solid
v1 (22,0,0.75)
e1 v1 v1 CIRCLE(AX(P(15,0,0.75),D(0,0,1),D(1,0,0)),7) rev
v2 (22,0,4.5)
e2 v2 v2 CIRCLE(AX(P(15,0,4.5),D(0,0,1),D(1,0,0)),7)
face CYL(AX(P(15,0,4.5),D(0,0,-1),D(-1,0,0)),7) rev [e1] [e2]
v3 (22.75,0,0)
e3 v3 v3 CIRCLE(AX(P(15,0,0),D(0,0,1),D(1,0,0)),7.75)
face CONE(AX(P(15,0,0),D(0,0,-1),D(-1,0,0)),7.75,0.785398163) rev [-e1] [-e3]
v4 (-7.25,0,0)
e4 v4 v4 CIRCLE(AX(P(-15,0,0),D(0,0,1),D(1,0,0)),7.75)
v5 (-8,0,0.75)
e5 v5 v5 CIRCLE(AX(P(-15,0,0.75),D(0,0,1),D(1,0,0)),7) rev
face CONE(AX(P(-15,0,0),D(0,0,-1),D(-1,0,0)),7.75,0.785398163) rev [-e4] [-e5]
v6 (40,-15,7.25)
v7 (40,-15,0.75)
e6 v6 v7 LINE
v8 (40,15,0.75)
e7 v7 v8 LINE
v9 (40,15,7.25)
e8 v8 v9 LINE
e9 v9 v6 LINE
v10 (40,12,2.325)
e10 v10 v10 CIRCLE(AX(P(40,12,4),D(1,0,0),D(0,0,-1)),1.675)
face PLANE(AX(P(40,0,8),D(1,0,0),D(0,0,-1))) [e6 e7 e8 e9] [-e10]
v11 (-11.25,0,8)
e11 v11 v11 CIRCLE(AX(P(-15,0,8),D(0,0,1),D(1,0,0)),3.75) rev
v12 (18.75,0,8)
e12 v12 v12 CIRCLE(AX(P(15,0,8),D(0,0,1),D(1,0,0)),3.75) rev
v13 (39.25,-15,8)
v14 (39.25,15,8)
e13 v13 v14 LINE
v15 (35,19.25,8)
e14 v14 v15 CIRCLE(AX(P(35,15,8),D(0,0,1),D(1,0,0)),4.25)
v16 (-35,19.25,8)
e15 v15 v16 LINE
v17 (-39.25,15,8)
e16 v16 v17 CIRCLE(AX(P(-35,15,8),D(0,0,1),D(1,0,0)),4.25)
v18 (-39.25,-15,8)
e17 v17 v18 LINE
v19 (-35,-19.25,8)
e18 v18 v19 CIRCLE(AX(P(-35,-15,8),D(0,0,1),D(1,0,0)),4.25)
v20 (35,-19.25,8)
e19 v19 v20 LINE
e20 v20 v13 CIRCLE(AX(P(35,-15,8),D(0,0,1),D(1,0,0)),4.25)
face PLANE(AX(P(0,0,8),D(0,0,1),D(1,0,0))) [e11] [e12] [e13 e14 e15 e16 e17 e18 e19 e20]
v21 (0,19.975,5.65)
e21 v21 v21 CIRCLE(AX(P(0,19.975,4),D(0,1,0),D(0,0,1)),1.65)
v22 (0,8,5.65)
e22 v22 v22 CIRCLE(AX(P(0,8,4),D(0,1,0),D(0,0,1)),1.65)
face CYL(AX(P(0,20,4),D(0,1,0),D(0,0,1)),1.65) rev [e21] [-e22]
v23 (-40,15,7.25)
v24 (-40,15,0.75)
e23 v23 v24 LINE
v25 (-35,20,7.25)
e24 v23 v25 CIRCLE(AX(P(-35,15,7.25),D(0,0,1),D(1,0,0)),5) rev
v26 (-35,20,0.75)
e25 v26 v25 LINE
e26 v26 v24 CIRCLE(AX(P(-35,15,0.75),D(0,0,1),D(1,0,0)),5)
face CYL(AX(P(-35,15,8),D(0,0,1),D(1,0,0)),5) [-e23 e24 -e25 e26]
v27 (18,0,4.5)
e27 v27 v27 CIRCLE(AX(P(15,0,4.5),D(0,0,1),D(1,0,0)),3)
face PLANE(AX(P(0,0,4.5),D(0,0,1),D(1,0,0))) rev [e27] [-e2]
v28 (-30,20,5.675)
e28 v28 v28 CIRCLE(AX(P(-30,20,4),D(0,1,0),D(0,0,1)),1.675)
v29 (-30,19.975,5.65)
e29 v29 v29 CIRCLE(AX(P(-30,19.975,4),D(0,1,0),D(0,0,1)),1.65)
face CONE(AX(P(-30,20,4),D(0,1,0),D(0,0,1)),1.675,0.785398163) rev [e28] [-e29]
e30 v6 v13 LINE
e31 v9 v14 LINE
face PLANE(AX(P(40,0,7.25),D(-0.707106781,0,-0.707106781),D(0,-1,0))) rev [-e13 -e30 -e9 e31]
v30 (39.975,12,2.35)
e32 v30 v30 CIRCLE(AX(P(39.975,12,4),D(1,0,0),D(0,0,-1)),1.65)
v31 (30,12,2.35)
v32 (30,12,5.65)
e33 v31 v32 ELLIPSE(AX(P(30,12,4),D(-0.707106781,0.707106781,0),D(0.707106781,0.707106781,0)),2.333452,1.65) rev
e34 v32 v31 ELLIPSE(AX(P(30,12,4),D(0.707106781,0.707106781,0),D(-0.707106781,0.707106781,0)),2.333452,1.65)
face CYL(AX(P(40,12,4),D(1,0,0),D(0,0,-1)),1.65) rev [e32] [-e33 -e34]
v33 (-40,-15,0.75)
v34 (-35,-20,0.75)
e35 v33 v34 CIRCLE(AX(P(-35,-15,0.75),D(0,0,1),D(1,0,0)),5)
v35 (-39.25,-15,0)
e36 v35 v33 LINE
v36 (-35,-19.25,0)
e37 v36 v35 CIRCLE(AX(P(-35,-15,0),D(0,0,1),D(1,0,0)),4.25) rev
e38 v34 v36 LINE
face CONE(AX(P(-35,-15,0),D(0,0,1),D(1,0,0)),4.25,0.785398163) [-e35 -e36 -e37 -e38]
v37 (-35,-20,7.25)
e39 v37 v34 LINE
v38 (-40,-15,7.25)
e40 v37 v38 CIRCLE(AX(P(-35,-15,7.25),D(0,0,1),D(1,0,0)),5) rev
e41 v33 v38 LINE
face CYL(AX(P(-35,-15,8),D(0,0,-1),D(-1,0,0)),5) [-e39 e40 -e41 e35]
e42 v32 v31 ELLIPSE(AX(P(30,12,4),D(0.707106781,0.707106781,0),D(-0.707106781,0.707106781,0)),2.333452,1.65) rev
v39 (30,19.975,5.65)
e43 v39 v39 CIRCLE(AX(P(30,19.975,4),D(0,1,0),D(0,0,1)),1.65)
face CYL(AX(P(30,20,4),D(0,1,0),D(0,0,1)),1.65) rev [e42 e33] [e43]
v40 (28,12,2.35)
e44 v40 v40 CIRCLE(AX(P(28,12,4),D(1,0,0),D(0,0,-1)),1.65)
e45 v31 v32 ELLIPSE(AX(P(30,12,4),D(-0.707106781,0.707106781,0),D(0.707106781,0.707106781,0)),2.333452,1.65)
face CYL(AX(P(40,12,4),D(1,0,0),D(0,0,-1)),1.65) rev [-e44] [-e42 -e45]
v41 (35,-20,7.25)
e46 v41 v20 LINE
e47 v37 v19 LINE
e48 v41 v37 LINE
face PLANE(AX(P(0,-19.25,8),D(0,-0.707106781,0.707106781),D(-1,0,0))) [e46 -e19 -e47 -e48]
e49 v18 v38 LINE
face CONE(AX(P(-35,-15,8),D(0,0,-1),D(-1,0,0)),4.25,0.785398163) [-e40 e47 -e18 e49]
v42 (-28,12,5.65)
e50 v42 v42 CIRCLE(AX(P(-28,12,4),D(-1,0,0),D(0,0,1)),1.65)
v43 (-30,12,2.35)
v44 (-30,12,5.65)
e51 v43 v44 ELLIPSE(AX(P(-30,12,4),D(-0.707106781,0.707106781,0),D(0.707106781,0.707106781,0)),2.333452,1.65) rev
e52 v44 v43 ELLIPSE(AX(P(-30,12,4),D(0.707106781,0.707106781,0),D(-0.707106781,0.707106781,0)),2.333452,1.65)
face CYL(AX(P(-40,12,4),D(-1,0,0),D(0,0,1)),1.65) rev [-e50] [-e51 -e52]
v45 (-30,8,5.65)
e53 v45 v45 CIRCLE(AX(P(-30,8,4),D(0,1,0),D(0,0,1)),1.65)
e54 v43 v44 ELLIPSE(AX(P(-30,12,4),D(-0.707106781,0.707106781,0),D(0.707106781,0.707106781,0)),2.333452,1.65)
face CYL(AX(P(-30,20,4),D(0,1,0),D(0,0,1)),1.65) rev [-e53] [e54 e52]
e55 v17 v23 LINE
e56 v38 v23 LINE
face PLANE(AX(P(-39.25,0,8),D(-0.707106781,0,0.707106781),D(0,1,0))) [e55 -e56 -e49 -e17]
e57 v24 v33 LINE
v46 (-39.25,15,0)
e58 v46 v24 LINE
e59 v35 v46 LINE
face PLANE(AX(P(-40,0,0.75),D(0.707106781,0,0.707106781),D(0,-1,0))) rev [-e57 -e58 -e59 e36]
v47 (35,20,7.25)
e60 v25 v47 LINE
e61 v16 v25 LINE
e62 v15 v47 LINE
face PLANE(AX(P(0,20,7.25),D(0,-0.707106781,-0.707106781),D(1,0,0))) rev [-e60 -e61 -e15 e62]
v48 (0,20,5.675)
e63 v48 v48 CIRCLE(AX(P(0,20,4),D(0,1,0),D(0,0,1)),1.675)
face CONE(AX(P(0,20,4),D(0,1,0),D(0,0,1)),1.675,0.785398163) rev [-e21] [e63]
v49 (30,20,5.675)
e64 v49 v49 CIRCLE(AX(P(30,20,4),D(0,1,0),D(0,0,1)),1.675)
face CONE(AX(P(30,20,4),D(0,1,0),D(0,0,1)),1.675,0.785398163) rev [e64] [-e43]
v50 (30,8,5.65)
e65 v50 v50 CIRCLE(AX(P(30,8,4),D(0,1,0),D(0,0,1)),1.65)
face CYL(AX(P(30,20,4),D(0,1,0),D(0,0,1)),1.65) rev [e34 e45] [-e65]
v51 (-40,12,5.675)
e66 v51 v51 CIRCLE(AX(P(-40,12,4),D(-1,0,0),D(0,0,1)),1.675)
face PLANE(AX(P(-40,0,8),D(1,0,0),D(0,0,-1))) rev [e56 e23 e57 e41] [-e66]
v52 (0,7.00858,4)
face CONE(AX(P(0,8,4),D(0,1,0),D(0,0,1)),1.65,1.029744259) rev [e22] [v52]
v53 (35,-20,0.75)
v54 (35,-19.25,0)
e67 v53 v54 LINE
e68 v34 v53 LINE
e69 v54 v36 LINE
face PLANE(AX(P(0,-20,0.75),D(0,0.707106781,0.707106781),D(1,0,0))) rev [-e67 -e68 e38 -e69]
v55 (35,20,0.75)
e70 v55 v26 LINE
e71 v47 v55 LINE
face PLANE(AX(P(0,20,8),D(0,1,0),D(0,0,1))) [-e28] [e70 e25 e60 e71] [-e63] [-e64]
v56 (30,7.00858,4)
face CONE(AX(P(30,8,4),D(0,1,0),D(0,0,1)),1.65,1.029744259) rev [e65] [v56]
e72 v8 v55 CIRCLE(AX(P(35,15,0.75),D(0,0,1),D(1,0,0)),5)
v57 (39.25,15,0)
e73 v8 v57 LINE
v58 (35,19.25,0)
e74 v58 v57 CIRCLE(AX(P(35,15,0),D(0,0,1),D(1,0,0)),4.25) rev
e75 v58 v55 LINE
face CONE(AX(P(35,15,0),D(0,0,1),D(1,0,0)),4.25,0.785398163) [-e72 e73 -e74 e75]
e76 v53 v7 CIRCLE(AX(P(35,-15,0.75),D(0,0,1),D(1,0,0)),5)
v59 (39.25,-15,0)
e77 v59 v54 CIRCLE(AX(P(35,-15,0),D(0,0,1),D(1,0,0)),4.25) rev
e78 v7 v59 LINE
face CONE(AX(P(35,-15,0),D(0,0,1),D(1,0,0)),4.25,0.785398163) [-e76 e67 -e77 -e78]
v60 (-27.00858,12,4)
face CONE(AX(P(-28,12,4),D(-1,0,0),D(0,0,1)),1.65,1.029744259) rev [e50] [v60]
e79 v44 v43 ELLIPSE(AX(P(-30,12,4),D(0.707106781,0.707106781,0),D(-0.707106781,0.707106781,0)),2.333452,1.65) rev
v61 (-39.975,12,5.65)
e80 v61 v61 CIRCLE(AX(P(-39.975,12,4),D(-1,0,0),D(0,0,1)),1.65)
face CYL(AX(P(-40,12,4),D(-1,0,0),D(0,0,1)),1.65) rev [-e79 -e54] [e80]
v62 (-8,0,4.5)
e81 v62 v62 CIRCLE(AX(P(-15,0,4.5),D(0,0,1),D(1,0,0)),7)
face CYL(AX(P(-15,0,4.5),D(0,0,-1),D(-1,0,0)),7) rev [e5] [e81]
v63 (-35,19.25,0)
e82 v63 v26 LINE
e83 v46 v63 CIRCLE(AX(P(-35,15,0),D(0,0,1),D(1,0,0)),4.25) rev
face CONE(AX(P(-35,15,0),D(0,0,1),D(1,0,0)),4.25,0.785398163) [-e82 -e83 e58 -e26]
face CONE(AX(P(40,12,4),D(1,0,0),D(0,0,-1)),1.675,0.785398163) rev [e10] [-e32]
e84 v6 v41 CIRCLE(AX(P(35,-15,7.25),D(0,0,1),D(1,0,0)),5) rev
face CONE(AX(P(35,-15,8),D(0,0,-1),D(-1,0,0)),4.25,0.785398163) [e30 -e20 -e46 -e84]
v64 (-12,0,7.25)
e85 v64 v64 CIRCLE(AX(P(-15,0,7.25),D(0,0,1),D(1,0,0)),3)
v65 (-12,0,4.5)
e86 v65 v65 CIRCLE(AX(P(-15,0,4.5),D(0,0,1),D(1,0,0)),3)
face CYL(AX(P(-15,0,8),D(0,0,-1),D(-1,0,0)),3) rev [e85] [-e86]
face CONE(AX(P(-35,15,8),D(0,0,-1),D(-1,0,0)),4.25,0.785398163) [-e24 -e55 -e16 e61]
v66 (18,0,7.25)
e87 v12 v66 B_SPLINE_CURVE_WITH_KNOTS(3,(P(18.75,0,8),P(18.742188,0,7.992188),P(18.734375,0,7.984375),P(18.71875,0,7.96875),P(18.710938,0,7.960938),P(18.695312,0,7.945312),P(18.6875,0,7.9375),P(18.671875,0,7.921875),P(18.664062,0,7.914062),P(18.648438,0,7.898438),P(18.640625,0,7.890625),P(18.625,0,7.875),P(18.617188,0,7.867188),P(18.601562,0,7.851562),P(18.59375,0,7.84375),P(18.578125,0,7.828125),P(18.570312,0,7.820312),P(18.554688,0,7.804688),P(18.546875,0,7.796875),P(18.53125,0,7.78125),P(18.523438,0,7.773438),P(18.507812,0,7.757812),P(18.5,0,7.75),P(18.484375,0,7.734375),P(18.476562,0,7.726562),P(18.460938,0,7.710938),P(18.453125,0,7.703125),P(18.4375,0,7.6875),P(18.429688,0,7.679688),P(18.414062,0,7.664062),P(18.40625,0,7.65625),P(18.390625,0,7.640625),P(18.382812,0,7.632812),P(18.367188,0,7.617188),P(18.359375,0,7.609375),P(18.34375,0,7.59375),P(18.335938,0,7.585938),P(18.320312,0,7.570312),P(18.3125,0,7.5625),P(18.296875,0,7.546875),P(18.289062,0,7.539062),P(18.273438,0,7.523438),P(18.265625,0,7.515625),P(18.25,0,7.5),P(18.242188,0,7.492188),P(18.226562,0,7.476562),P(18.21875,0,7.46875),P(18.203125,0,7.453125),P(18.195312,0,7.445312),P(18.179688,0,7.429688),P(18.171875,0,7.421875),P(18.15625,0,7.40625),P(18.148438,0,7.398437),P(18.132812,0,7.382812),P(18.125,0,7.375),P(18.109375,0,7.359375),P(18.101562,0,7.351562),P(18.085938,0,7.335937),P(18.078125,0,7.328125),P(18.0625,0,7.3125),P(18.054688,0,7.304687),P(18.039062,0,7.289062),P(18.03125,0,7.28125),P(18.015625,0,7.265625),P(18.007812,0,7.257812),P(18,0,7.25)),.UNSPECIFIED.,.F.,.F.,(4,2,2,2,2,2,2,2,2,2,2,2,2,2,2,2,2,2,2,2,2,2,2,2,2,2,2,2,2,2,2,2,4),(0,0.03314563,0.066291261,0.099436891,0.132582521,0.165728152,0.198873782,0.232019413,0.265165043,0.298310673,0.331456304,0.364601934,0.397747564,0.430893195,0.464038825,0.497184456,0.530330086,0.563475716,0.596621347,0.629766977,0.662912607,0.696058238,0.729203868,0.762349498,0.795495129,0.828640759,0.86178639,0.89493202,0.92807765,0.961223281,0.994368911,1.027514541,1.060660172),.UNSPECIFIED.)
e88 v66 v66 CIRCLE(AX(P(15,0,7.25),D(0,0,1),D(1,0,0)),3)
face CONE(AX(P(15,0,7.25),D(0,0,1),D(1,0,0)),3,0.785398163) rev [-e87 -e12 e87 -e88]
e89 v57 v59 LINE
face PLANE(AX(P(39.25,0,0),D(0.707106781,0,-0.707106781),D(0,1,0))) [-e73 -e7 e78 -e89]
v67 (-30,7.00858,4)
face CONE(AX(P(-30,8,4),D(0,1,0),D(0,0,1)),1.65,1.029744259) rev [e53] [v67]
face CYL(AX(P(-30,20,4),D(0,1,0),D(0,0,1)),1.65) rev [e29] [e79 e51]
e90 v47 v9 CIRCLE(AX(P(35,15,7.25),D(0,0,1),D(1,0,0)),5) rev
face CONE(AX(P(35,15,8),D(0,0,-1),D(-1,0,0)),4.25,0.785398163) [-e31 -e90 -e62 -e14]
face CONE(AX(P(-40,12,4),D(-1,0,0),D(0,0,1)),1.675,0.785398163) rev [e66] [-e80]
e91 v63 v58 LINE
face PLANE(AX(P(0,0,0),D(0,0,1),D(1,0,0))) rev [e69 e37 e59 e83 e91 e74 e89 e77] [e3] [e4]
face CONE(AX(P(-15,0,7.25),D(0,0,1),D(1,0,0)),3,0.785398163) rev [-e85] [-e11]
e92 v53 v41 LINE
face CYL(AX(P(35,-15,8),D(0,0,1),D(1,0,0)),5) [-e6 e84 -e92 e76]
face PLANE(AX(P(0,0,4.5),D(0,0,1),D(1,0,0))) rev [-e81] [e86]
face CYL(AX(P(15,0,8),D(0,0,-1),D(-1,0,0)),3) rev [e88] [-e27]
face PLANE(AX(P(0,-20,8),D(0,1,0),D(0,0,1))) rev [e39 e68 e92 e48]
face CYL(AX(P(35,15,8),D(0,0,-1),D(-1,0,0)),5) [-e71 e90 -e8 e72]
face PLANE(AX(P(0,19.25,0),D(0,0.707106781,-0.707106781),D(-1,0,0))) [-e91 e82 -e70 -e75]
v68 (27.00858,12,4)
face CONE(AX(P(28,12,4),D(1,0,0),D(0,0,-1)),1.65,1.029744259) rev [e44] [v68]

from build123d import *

# Parameters (mm, degrees)
SKETCH1_W                             = 80
SKETCH1_H                             = 40
SKETCH1_R                             = 7
SKETCH1_R_2                           = 3
BOSS_EXTRUDE1_DEPTH                   = 8
CUT_EXTRUDE1_OUTLINE_R                = 7
CUT_EXTRUDE1_OUTLINE_R_2              = 3
CUT_EXTRUDE1_DEPTH                    = 4.5
FILLET1_R                             = 5
TAP_DRILL_FOR_M4X0_7_TAP1_D           = 3.3
TAP_DRILL_FOR_M4X0_7_TAP1_DEPTH       = 12
TAP_DRILL_FOR_M4X0_7_TAP1_CSINK_D     = 3.35
TAP_DRILL_FOR_M4X0_7_TAP1_CSINK_ANGLE = 90
TAP_DRILL_FOR_M4X0_7_TAP1_TIP         = 0.991420021
TAP_DRILL_FOR_M4X0_7_TAP2_D           = 3.3
TAP_DRILL_FOR_M4X0_7_TAP2_DEPTH       = 12
TAP_DRILL_FOR_M4X0_7_TAP2_CSINK_D     = 3.35
TAP_DRILL_FOR_M4X0_7_TAP2_CSINK_ANGLE = 90
TAP_DRILL_FOR_M4X0_7_TAP2_TIP         = 0.991420021
TAP_DRILL_FOR_M4X0_7_TAP3_D           = 3.3
TAP_DRILL_FOR_M4X0_7_TAP3_DEPTH       = 12
TAP_DRILL_FOR_M4X0_7_TAP3_CSINK_D     = 3.35
TAP_DRILL_FOR_M4X0_7_TAP3_CSINK_ANGLE = 90
TAP_DRILL_FOR_M4X0_7_TAP3_TIP         = 0.991420021
CHAMFER1_SIZE                         = 0.75


# Read off the part's stored shape, not the designer's step: Cut-Extrude1
with BuildPart() as part:
    # Sketch1 → Boss-Extrude1 (new body)
    # profile 1 of 3: a face of its own
    with BuildSketch(Plane.XY):
        Rectangle(SKETCH1_W, SKETCH1_H)
        with Locations((15, 0)):
            Circle(SKETCH1_R, mode=Mode.SUBTRACT)
        with Locations((-15, 0)):
            Circle(SKETCH1_R, mode=Mode.SUBTRACT)
    # profile 2 of 3: a face of its own
    with BuildSketch(Plane.XY):
        with Locations((-15, 0)):
            Circle(SKETCH1_R)
        with Locations((-15, 0)):
            Circle(SKETCH1_R_2, mode=Mode.SUBTRACT)
    # profile 3 of 3: a face of its own
    with BuildSketch(Plane.XY):
        with Locations((15, 0)):
            Circle(SKETCH1_R)
        with Locations((15, 0)):
            Circle(SKETCH1_R_2, mode=Mode.SUBTRACT)
    extrude(amount=BOSS_EXTRUDE1_DEPTH)

    # Cut-Extrude1 outline → Cut-Extrude1 (cut)
    # profile 1 of 2: a face of its own
    with BuildSketch(Plane.XY):
        with Locations((-15, 0)):
            Circle(CUT_EXTRUDE1_OUTLINE_R)
        with Locations((-15, 0)):
            Circle(CUT_EXTRUDE1_OUTLINE_R_2, mode=Mode.SUBTRACT)
    # profile 2 of 2: a face of its own
    with BuildSketch(Plane.XY):
        with Locations((15, 0)):
            Circle(CUT_EXTRUDE1_OUTLINE_R)
        with Locations((15, 0)):
            Circle(CUT_EXTRUDE1_OUTLINE_R_2, mode=Mode.SUBTRACT)
    extrude(amount=CUT_EXTRUDE1_DEPTH, mode=Mode.SUBTRACT)

    # Fillet1
    fillet1_edges = [part.edges().sort_by_distance(p)[0] for p in [
        (40, -20, 4),
        (-40, -20, 4),
        (-40, 20, 4),
        (40, 20, 4),
    ]]
    fillet(fillet1_edges, radius=FILLET1_R)

    # Tap Drill for M4x0.7 Tap1
    with Locations(Plane(origin=(0, 20, 0), x_dir=(1, 0, 0), z_dir=(0, 1, 0))):
        with Locations((30, -4), (0, -4), (-30, -4)):
            CounterSinkHole(TAP_DRILL_FOR_M4X0_7_TAP1_D / 2, TAP_DRILL_FOR_M4X0_7_TAP1_CSINK_D / 2, depth=TAP_DRILL_FOR_M4X0_7_TAP1_DEPTH, counter_sink_angle=TAP_DRILL_FOR_M4X0_7_TAP1_CSINK_ANGLE)
            with Locations((0, 0, -(TAP_DRILL_FOR_M4X0_7_TAP1_DEPTH + TAP_DRILL_FOR_M4X0_7_TAP1_TIP / 2))):  # 118° drill point
                Cone(0, TAP_DRILL_FOR_M4X0_7_TAP1_D / 2, TAP_DRILL_FOR_M4X0_7_TAP1_TIP, mode=Mode.SUBTRACT)

    # Tap Drill for M4x0.7 Tap2
    with Locations(Plane(origin=(40, 0, 0), x_dir=(0, 0, -1), z_dir=(1, 0, 0))):
        with Locations((-4, 12)):
            CounterSinkHole(TAP_DRILL_FOR_M4X0_7_TAP2_D / 2, TAP_DRILL_FOR_M4X0_7_TAP2_CSINK_D / 2, depth=TAP_DRILL_FOR_M4X0_7_TAP2_DEPTH, counter_sink_angle=TAP_DRILL_FOR_M4X0_7_TAP2_CSINK_ANGLE)
            with Locations((0, 0, -(TAP_DRILL_FOR_M4X0_7_TAP2_DEPTH + TAP_DRILL_FOR_M4X0_7_TAP2_TIP / 2))):  # 118° drill point
                Cone(0, TAP_DRILL_FOR_M4X0_7_TAP2_D / 2, TAP_DRILL_FOR_M4X0_7_TAP2_TIP, mode=Mode.SUBTRACT)

    # Tap Drill for M4x0.7 Tap3
    with Locations(Plane.ZY.offset(40)):
        with Locations((4, 12)):
            CounterSinkHole(TAP_DRILL_FOR_M4X0_7_TAP3_D / 2, TAP_DRILL_FOR_M4X0_7_TAP3_CSINK_D / 2, depth=TAP_DRILL_FOR_M4X0_7_TAP3_DEPTH, counter_sink_angle=TAP_DRILL_FOR_M4X0_7_TAP3_CSINK_ANGLE)
            with Locations((0, 0, -(TAP_DRILL_FOR_M4X0_7_TAP3_DEPTH + TAP_DRILL_FOR_M4X0_7_TAP3_TIP / 2))):  # 118° drill point
                Cone(0, TAP_DRILL_FOR_M4X0_7_TAP3_D / 2, TAP_DRILL_FOR_M4X0_7_TAP3_TIP, mode=Mode.SUBTRACT)

    # Chamfer1
    chamfer1_edges = [part.edges().sort_by_distance(p)[0] for p in [
        (8, 0, 0),
        (-18, 0, 8),
        (-22, 0, 0),
        (12, 0, 8),
        (40, 0, 0),
        (40, 0, 8),
        (0, -20, 0),
        (-40, 0, 0),
        (0, 20, 0),
        (38.535533906, 18.535533906, 0),
        (-38.535533906, 18.535533906, 0),
        (-38.535533906, -18.535533906, 0),
        (38.535533906, -18.535533906, 0),
        (0, -20, 8),
        (0, 20, 8),
        (-40, 0, 8),
        (38.535533906, 18.535533906, 8),
        (-38.535533906, 18.535533906, 8),
        (-38.535533906, -18.535533906, 8),
        (38.535533906, -18.535533906, 8),
    ]]
    chamfer(chamfer1_edges, length=CHAMFER1_SIZE)


solid = part.part
